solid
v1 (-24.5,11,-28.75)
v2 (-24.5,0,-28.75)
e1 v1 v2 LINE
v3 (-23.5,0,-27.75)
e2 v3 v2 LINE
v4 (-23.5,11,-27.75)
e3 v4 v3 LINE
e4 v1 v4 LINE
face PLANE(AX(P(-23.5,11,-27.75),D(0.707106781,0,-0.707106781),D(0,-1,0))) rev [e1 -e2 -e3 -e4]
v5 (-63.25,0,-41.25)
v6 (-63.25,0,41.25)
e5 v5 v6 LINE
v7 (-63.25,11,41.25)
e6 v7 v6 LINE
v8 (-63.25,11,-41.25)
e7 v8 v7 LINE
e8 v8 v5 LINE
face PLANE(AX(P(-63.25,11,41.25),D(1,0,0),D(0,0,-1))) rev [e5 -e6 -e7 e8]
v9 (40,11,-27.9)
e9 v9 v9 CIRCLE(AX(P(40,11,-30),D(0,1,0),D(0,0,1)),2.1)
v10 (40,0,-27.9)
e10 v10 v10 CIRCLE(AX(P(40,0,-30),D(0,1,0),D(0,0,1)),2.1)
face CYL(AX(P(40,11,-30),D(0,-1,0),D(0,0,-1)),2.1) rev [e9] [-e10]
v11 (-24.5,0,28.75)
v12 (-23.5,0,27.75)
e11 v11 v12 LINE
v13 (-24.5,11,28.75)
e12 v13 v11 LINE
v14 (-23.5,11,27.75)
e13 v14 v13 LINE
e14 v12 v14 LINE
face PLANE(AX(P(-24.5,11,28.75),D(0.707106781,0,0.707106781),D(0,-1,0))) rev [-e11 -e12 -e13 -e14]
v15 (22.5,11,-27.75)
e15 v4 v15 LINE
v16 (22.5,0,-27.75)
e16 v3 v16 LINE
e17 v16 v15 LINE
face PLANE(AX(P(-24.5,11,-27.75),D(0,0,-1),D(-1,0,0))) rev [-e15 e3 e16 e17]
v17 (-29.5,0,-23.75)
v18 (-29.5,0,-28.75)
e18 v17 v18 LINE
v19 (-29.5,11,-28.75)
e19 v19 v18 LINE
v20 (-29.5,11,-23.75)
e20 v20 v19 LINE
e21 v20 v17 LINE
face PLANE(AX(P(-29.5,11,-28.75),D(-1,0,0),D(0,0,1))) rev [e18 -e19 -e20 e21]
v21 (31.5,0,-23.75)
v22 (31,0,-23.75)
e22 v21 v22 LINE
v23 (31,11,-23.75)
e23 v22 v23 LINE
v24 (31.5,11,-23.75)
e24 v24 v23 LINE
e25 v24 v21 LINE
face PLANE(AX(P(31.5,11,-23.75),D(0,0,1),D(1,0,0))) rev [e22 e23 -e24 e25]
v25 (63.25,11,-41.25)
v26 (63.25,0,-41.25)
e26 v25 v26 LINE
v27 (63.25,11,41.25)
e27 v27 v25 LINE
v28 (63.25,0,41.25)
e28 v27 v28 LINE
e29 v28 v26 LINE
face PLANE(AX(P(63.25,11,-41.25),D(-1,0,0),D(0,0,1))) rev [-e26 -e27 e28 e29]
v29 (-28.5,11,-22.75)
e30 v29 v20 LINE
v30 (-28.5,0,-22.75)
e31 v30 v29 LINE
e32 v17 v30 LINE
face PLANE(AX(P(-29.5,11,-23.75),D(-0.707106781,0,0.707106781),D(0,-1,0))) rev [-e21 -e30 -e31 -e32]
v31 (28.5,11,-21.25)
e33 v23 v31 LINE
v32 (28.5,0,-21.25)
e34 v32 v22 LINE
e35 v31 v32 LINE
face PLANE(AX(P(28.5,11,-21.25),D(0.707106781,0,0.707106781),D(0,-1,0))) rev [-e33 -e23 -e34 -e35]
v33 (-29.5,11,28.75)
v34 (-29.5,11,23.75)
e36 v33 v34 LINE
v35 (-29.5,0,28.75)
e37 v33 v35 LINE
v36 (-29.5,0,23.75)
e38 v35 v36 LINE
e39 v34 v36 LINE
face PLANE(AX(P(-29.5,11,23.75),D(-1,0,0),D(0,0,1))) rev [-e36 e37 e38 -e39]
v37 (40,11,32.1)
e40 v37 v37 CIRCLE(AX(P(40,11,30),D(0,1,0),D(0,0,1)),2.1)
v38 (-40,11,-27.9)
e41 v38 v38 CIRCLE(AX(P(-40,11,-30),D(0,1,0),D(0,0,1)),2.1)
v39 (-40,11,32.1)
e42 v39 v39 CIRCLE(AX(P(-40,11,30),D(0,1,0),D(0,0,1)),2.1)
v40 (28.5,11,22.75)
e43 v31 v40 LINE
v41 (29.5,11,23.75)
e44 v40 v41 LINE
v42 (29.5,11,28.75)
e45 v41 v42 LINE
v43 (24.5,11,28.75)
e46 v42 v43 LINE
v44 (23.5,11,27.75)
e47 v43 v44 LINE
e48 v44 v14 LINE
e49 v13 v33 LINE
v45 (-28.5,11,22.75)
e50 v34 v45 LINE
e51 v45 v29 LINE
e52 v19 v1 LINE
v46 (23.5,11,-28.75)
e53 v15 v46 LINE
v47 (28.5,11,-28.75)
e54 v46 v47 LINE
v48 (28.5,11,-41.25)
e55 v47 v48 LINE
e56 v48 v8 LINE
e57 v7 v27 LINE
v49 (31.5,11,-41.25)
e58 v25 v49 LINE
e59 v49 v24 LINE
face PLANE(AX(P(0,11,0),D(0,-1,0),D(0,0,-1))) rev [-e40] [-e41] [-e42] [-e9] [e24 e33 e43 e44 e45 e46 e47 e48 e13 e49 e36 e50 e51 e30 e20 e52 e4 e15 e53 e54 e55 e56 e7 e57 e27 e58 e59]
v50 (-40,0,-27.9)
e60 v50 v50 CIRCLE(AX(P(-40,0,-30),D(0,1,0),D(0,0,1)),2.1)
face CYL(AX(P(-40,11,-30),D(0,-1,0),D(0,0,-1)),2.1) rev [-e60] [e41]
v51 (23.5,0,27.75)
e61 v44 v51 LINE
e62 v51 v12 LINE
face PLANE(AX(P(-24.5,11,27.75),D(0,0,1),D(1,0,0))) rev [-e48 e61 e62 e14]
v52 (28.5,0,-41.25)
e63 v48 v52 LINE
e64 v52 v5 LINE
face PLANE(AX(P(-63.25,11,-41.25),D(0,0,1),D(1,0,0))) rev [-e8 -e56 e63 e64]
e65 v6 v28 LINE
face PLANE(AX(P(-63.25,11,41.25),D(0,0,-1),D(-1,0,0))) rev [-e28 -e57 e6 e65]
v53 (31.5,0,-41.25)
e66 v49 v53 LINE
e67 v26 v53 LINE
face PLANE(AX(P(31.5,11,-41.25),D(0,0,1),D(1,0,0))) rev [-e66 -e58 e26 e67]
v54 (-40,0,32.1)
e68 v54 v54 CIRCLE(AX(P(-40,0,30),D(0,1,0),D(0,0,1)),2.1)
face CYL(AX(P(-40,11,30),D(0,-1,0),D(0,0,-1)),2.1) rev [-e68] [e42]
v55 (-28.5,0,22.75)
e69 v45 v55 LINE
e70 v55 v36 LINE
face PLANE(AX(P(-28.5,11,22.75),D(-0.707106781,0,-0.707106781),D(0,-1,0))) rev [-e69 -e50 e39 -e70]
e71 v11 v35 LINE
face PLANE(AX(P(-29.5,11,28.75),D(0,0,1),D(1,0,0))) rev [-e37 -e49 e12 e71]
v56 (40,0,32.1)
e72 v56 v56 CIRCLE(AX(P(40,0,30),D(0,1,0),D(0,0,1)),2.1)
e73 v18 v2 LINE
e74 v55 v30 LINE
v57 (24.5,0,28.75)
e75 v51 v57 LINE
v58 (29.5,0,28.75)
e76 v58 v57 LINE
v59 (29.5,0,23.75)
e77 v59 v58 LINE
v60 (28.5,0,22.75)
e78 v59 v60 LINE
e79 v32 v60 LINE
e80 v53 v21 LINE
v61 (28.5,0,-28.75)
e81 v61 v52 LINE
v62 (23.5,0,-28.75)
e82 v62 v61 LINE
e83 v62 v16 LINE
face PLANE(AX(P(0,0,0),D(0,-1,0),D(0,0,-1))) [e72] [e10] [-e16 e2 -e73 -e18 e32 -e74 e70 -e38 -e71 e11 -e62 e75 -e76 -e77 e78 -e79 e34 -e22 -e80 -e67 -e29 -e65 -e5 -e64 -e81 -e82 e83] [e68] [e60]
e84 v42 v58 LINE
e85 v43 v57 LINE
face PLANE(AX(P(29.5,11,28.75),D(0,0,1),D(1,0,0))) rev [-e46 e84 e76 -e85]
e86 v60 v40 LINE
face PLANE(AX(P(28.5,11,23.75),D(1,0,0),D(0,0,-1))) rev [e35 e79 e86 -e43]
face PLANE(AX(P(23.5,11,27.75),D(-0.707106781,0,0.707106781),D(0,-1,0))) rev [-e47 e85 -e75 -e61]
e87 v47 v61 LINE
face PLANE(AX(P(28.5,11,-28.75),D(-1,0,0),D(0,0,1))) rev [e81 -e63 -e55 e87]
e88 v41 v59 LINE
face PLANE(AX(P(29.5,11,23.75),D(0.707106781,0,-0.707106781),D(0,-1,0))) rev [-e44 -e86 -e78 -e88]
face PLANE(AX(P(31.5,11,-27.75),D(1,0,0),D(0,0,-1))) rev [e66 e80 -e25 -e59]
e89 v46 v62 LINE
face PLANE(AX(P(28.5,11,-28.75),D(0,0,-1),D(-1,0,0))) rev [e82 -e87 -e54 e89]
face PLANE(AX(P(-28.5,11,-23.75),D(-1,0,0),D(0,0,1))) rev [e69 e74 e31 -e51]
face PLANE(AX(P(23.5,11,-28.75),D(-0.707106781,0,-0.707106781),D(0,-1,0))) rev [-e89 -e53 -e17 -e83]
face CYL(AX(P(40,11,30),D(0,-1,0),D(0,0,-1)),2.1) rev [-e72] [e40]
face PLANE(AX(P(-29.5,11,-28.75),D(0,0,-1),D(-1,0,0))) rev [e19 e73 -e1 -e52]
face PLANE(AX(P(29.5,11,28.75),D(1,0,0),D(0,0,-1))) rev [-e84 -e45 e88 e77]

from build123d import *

# Parameters (mm, degrees)
SKETCH_1_R      = 2.1
EXTRUDE_2_DEPTH = 11
CHAMFER_1_SIZE  = 2.5
CHAMFER_2_SIZE  = 1


with BuildPart() as part:
    # Эскиз1 → Бобышка-Вытянуть2 (new body)
    with BuildSketch(Plane(origin=(0, 0, 0), x_dir=(1, 0, 0), z_dir=(0, 1, 0))):
        Polygon((31.5, 27.75), (31.5, 41.25), (63.25, 41.25), (63.25, -41.25), (-63.25, -41.25), (-63.25, 41.25), (28.5, 41.25), (28.5, 28.75), (23.5, 28.75), (23.5, 27.75), (-24.5, 27.75), (-24.5, 28.75), (-29.5, 28.75), (-29.5, 23.75), (-28.5, 23.75), (-28.5, -23.75), (-29.5, -23.75), (-29.5, -28.75), (-24.5, -28.75), (-24.5, -27.75), (24.5, -27.75), (24.5, -28.75), (29.5, -28.75), (29.5, -23.75), (28.5, -23.75), (28.5, 23.75), (31.5, 23.75), align=None)
        with Locations(Location((-40, 30, 0), (0, 0, 270))):
            Circle(SKETCH_1_R, mode=Mode.SUBTRACT)
        with Locations(Location((40, 30, 0), (0, 0, 270))):
            Circle(SKETCH_1_R, mode=Mode.SUBTRACT)
        with Locations(Location((40, -30, 0), (0, 0, 270))):
            Circle(SKETCH_1_R, mode=Mode.SUBTRACT)
        with Locations(Location((-40, -30, 0), (0, 0, 270))):
            Circle(SKETCH_1_R, mode=Mode.SUBTRACT)
    extrude(amount=EXTRUDE_2_DEPTH)

    # Фаска1
    chamfer_1_edges = [part.edges().sort_by_distance(p)[0] for p in [
        (28.5, 5.5, -23.75),
    ]]
    chamfer(chamfer_1_edges, length=CHAMFER_1_SIZE)

    # Фаска2
    chamfer_2_edges = [part.edges().sort_by_distance(p)[0] for p in [
        (23.5, 5.5, -27.75),
        (28.5, 5.5, 23.75),
        (24.5, 5.5, 27.75),
        (-24.5, 5.5, 27.75),
        (-28.5, 5.5, 23.75),
        (-28.5, 5.5, -23.75),
        (-24.5, 5.5, -27.75),
    ]]
    chamfer(chamfer_2_edges, length=CHAMFER_2_SIZE - 0.0001)  # a hair under: the kernel refuses the full size


solid = part.part
